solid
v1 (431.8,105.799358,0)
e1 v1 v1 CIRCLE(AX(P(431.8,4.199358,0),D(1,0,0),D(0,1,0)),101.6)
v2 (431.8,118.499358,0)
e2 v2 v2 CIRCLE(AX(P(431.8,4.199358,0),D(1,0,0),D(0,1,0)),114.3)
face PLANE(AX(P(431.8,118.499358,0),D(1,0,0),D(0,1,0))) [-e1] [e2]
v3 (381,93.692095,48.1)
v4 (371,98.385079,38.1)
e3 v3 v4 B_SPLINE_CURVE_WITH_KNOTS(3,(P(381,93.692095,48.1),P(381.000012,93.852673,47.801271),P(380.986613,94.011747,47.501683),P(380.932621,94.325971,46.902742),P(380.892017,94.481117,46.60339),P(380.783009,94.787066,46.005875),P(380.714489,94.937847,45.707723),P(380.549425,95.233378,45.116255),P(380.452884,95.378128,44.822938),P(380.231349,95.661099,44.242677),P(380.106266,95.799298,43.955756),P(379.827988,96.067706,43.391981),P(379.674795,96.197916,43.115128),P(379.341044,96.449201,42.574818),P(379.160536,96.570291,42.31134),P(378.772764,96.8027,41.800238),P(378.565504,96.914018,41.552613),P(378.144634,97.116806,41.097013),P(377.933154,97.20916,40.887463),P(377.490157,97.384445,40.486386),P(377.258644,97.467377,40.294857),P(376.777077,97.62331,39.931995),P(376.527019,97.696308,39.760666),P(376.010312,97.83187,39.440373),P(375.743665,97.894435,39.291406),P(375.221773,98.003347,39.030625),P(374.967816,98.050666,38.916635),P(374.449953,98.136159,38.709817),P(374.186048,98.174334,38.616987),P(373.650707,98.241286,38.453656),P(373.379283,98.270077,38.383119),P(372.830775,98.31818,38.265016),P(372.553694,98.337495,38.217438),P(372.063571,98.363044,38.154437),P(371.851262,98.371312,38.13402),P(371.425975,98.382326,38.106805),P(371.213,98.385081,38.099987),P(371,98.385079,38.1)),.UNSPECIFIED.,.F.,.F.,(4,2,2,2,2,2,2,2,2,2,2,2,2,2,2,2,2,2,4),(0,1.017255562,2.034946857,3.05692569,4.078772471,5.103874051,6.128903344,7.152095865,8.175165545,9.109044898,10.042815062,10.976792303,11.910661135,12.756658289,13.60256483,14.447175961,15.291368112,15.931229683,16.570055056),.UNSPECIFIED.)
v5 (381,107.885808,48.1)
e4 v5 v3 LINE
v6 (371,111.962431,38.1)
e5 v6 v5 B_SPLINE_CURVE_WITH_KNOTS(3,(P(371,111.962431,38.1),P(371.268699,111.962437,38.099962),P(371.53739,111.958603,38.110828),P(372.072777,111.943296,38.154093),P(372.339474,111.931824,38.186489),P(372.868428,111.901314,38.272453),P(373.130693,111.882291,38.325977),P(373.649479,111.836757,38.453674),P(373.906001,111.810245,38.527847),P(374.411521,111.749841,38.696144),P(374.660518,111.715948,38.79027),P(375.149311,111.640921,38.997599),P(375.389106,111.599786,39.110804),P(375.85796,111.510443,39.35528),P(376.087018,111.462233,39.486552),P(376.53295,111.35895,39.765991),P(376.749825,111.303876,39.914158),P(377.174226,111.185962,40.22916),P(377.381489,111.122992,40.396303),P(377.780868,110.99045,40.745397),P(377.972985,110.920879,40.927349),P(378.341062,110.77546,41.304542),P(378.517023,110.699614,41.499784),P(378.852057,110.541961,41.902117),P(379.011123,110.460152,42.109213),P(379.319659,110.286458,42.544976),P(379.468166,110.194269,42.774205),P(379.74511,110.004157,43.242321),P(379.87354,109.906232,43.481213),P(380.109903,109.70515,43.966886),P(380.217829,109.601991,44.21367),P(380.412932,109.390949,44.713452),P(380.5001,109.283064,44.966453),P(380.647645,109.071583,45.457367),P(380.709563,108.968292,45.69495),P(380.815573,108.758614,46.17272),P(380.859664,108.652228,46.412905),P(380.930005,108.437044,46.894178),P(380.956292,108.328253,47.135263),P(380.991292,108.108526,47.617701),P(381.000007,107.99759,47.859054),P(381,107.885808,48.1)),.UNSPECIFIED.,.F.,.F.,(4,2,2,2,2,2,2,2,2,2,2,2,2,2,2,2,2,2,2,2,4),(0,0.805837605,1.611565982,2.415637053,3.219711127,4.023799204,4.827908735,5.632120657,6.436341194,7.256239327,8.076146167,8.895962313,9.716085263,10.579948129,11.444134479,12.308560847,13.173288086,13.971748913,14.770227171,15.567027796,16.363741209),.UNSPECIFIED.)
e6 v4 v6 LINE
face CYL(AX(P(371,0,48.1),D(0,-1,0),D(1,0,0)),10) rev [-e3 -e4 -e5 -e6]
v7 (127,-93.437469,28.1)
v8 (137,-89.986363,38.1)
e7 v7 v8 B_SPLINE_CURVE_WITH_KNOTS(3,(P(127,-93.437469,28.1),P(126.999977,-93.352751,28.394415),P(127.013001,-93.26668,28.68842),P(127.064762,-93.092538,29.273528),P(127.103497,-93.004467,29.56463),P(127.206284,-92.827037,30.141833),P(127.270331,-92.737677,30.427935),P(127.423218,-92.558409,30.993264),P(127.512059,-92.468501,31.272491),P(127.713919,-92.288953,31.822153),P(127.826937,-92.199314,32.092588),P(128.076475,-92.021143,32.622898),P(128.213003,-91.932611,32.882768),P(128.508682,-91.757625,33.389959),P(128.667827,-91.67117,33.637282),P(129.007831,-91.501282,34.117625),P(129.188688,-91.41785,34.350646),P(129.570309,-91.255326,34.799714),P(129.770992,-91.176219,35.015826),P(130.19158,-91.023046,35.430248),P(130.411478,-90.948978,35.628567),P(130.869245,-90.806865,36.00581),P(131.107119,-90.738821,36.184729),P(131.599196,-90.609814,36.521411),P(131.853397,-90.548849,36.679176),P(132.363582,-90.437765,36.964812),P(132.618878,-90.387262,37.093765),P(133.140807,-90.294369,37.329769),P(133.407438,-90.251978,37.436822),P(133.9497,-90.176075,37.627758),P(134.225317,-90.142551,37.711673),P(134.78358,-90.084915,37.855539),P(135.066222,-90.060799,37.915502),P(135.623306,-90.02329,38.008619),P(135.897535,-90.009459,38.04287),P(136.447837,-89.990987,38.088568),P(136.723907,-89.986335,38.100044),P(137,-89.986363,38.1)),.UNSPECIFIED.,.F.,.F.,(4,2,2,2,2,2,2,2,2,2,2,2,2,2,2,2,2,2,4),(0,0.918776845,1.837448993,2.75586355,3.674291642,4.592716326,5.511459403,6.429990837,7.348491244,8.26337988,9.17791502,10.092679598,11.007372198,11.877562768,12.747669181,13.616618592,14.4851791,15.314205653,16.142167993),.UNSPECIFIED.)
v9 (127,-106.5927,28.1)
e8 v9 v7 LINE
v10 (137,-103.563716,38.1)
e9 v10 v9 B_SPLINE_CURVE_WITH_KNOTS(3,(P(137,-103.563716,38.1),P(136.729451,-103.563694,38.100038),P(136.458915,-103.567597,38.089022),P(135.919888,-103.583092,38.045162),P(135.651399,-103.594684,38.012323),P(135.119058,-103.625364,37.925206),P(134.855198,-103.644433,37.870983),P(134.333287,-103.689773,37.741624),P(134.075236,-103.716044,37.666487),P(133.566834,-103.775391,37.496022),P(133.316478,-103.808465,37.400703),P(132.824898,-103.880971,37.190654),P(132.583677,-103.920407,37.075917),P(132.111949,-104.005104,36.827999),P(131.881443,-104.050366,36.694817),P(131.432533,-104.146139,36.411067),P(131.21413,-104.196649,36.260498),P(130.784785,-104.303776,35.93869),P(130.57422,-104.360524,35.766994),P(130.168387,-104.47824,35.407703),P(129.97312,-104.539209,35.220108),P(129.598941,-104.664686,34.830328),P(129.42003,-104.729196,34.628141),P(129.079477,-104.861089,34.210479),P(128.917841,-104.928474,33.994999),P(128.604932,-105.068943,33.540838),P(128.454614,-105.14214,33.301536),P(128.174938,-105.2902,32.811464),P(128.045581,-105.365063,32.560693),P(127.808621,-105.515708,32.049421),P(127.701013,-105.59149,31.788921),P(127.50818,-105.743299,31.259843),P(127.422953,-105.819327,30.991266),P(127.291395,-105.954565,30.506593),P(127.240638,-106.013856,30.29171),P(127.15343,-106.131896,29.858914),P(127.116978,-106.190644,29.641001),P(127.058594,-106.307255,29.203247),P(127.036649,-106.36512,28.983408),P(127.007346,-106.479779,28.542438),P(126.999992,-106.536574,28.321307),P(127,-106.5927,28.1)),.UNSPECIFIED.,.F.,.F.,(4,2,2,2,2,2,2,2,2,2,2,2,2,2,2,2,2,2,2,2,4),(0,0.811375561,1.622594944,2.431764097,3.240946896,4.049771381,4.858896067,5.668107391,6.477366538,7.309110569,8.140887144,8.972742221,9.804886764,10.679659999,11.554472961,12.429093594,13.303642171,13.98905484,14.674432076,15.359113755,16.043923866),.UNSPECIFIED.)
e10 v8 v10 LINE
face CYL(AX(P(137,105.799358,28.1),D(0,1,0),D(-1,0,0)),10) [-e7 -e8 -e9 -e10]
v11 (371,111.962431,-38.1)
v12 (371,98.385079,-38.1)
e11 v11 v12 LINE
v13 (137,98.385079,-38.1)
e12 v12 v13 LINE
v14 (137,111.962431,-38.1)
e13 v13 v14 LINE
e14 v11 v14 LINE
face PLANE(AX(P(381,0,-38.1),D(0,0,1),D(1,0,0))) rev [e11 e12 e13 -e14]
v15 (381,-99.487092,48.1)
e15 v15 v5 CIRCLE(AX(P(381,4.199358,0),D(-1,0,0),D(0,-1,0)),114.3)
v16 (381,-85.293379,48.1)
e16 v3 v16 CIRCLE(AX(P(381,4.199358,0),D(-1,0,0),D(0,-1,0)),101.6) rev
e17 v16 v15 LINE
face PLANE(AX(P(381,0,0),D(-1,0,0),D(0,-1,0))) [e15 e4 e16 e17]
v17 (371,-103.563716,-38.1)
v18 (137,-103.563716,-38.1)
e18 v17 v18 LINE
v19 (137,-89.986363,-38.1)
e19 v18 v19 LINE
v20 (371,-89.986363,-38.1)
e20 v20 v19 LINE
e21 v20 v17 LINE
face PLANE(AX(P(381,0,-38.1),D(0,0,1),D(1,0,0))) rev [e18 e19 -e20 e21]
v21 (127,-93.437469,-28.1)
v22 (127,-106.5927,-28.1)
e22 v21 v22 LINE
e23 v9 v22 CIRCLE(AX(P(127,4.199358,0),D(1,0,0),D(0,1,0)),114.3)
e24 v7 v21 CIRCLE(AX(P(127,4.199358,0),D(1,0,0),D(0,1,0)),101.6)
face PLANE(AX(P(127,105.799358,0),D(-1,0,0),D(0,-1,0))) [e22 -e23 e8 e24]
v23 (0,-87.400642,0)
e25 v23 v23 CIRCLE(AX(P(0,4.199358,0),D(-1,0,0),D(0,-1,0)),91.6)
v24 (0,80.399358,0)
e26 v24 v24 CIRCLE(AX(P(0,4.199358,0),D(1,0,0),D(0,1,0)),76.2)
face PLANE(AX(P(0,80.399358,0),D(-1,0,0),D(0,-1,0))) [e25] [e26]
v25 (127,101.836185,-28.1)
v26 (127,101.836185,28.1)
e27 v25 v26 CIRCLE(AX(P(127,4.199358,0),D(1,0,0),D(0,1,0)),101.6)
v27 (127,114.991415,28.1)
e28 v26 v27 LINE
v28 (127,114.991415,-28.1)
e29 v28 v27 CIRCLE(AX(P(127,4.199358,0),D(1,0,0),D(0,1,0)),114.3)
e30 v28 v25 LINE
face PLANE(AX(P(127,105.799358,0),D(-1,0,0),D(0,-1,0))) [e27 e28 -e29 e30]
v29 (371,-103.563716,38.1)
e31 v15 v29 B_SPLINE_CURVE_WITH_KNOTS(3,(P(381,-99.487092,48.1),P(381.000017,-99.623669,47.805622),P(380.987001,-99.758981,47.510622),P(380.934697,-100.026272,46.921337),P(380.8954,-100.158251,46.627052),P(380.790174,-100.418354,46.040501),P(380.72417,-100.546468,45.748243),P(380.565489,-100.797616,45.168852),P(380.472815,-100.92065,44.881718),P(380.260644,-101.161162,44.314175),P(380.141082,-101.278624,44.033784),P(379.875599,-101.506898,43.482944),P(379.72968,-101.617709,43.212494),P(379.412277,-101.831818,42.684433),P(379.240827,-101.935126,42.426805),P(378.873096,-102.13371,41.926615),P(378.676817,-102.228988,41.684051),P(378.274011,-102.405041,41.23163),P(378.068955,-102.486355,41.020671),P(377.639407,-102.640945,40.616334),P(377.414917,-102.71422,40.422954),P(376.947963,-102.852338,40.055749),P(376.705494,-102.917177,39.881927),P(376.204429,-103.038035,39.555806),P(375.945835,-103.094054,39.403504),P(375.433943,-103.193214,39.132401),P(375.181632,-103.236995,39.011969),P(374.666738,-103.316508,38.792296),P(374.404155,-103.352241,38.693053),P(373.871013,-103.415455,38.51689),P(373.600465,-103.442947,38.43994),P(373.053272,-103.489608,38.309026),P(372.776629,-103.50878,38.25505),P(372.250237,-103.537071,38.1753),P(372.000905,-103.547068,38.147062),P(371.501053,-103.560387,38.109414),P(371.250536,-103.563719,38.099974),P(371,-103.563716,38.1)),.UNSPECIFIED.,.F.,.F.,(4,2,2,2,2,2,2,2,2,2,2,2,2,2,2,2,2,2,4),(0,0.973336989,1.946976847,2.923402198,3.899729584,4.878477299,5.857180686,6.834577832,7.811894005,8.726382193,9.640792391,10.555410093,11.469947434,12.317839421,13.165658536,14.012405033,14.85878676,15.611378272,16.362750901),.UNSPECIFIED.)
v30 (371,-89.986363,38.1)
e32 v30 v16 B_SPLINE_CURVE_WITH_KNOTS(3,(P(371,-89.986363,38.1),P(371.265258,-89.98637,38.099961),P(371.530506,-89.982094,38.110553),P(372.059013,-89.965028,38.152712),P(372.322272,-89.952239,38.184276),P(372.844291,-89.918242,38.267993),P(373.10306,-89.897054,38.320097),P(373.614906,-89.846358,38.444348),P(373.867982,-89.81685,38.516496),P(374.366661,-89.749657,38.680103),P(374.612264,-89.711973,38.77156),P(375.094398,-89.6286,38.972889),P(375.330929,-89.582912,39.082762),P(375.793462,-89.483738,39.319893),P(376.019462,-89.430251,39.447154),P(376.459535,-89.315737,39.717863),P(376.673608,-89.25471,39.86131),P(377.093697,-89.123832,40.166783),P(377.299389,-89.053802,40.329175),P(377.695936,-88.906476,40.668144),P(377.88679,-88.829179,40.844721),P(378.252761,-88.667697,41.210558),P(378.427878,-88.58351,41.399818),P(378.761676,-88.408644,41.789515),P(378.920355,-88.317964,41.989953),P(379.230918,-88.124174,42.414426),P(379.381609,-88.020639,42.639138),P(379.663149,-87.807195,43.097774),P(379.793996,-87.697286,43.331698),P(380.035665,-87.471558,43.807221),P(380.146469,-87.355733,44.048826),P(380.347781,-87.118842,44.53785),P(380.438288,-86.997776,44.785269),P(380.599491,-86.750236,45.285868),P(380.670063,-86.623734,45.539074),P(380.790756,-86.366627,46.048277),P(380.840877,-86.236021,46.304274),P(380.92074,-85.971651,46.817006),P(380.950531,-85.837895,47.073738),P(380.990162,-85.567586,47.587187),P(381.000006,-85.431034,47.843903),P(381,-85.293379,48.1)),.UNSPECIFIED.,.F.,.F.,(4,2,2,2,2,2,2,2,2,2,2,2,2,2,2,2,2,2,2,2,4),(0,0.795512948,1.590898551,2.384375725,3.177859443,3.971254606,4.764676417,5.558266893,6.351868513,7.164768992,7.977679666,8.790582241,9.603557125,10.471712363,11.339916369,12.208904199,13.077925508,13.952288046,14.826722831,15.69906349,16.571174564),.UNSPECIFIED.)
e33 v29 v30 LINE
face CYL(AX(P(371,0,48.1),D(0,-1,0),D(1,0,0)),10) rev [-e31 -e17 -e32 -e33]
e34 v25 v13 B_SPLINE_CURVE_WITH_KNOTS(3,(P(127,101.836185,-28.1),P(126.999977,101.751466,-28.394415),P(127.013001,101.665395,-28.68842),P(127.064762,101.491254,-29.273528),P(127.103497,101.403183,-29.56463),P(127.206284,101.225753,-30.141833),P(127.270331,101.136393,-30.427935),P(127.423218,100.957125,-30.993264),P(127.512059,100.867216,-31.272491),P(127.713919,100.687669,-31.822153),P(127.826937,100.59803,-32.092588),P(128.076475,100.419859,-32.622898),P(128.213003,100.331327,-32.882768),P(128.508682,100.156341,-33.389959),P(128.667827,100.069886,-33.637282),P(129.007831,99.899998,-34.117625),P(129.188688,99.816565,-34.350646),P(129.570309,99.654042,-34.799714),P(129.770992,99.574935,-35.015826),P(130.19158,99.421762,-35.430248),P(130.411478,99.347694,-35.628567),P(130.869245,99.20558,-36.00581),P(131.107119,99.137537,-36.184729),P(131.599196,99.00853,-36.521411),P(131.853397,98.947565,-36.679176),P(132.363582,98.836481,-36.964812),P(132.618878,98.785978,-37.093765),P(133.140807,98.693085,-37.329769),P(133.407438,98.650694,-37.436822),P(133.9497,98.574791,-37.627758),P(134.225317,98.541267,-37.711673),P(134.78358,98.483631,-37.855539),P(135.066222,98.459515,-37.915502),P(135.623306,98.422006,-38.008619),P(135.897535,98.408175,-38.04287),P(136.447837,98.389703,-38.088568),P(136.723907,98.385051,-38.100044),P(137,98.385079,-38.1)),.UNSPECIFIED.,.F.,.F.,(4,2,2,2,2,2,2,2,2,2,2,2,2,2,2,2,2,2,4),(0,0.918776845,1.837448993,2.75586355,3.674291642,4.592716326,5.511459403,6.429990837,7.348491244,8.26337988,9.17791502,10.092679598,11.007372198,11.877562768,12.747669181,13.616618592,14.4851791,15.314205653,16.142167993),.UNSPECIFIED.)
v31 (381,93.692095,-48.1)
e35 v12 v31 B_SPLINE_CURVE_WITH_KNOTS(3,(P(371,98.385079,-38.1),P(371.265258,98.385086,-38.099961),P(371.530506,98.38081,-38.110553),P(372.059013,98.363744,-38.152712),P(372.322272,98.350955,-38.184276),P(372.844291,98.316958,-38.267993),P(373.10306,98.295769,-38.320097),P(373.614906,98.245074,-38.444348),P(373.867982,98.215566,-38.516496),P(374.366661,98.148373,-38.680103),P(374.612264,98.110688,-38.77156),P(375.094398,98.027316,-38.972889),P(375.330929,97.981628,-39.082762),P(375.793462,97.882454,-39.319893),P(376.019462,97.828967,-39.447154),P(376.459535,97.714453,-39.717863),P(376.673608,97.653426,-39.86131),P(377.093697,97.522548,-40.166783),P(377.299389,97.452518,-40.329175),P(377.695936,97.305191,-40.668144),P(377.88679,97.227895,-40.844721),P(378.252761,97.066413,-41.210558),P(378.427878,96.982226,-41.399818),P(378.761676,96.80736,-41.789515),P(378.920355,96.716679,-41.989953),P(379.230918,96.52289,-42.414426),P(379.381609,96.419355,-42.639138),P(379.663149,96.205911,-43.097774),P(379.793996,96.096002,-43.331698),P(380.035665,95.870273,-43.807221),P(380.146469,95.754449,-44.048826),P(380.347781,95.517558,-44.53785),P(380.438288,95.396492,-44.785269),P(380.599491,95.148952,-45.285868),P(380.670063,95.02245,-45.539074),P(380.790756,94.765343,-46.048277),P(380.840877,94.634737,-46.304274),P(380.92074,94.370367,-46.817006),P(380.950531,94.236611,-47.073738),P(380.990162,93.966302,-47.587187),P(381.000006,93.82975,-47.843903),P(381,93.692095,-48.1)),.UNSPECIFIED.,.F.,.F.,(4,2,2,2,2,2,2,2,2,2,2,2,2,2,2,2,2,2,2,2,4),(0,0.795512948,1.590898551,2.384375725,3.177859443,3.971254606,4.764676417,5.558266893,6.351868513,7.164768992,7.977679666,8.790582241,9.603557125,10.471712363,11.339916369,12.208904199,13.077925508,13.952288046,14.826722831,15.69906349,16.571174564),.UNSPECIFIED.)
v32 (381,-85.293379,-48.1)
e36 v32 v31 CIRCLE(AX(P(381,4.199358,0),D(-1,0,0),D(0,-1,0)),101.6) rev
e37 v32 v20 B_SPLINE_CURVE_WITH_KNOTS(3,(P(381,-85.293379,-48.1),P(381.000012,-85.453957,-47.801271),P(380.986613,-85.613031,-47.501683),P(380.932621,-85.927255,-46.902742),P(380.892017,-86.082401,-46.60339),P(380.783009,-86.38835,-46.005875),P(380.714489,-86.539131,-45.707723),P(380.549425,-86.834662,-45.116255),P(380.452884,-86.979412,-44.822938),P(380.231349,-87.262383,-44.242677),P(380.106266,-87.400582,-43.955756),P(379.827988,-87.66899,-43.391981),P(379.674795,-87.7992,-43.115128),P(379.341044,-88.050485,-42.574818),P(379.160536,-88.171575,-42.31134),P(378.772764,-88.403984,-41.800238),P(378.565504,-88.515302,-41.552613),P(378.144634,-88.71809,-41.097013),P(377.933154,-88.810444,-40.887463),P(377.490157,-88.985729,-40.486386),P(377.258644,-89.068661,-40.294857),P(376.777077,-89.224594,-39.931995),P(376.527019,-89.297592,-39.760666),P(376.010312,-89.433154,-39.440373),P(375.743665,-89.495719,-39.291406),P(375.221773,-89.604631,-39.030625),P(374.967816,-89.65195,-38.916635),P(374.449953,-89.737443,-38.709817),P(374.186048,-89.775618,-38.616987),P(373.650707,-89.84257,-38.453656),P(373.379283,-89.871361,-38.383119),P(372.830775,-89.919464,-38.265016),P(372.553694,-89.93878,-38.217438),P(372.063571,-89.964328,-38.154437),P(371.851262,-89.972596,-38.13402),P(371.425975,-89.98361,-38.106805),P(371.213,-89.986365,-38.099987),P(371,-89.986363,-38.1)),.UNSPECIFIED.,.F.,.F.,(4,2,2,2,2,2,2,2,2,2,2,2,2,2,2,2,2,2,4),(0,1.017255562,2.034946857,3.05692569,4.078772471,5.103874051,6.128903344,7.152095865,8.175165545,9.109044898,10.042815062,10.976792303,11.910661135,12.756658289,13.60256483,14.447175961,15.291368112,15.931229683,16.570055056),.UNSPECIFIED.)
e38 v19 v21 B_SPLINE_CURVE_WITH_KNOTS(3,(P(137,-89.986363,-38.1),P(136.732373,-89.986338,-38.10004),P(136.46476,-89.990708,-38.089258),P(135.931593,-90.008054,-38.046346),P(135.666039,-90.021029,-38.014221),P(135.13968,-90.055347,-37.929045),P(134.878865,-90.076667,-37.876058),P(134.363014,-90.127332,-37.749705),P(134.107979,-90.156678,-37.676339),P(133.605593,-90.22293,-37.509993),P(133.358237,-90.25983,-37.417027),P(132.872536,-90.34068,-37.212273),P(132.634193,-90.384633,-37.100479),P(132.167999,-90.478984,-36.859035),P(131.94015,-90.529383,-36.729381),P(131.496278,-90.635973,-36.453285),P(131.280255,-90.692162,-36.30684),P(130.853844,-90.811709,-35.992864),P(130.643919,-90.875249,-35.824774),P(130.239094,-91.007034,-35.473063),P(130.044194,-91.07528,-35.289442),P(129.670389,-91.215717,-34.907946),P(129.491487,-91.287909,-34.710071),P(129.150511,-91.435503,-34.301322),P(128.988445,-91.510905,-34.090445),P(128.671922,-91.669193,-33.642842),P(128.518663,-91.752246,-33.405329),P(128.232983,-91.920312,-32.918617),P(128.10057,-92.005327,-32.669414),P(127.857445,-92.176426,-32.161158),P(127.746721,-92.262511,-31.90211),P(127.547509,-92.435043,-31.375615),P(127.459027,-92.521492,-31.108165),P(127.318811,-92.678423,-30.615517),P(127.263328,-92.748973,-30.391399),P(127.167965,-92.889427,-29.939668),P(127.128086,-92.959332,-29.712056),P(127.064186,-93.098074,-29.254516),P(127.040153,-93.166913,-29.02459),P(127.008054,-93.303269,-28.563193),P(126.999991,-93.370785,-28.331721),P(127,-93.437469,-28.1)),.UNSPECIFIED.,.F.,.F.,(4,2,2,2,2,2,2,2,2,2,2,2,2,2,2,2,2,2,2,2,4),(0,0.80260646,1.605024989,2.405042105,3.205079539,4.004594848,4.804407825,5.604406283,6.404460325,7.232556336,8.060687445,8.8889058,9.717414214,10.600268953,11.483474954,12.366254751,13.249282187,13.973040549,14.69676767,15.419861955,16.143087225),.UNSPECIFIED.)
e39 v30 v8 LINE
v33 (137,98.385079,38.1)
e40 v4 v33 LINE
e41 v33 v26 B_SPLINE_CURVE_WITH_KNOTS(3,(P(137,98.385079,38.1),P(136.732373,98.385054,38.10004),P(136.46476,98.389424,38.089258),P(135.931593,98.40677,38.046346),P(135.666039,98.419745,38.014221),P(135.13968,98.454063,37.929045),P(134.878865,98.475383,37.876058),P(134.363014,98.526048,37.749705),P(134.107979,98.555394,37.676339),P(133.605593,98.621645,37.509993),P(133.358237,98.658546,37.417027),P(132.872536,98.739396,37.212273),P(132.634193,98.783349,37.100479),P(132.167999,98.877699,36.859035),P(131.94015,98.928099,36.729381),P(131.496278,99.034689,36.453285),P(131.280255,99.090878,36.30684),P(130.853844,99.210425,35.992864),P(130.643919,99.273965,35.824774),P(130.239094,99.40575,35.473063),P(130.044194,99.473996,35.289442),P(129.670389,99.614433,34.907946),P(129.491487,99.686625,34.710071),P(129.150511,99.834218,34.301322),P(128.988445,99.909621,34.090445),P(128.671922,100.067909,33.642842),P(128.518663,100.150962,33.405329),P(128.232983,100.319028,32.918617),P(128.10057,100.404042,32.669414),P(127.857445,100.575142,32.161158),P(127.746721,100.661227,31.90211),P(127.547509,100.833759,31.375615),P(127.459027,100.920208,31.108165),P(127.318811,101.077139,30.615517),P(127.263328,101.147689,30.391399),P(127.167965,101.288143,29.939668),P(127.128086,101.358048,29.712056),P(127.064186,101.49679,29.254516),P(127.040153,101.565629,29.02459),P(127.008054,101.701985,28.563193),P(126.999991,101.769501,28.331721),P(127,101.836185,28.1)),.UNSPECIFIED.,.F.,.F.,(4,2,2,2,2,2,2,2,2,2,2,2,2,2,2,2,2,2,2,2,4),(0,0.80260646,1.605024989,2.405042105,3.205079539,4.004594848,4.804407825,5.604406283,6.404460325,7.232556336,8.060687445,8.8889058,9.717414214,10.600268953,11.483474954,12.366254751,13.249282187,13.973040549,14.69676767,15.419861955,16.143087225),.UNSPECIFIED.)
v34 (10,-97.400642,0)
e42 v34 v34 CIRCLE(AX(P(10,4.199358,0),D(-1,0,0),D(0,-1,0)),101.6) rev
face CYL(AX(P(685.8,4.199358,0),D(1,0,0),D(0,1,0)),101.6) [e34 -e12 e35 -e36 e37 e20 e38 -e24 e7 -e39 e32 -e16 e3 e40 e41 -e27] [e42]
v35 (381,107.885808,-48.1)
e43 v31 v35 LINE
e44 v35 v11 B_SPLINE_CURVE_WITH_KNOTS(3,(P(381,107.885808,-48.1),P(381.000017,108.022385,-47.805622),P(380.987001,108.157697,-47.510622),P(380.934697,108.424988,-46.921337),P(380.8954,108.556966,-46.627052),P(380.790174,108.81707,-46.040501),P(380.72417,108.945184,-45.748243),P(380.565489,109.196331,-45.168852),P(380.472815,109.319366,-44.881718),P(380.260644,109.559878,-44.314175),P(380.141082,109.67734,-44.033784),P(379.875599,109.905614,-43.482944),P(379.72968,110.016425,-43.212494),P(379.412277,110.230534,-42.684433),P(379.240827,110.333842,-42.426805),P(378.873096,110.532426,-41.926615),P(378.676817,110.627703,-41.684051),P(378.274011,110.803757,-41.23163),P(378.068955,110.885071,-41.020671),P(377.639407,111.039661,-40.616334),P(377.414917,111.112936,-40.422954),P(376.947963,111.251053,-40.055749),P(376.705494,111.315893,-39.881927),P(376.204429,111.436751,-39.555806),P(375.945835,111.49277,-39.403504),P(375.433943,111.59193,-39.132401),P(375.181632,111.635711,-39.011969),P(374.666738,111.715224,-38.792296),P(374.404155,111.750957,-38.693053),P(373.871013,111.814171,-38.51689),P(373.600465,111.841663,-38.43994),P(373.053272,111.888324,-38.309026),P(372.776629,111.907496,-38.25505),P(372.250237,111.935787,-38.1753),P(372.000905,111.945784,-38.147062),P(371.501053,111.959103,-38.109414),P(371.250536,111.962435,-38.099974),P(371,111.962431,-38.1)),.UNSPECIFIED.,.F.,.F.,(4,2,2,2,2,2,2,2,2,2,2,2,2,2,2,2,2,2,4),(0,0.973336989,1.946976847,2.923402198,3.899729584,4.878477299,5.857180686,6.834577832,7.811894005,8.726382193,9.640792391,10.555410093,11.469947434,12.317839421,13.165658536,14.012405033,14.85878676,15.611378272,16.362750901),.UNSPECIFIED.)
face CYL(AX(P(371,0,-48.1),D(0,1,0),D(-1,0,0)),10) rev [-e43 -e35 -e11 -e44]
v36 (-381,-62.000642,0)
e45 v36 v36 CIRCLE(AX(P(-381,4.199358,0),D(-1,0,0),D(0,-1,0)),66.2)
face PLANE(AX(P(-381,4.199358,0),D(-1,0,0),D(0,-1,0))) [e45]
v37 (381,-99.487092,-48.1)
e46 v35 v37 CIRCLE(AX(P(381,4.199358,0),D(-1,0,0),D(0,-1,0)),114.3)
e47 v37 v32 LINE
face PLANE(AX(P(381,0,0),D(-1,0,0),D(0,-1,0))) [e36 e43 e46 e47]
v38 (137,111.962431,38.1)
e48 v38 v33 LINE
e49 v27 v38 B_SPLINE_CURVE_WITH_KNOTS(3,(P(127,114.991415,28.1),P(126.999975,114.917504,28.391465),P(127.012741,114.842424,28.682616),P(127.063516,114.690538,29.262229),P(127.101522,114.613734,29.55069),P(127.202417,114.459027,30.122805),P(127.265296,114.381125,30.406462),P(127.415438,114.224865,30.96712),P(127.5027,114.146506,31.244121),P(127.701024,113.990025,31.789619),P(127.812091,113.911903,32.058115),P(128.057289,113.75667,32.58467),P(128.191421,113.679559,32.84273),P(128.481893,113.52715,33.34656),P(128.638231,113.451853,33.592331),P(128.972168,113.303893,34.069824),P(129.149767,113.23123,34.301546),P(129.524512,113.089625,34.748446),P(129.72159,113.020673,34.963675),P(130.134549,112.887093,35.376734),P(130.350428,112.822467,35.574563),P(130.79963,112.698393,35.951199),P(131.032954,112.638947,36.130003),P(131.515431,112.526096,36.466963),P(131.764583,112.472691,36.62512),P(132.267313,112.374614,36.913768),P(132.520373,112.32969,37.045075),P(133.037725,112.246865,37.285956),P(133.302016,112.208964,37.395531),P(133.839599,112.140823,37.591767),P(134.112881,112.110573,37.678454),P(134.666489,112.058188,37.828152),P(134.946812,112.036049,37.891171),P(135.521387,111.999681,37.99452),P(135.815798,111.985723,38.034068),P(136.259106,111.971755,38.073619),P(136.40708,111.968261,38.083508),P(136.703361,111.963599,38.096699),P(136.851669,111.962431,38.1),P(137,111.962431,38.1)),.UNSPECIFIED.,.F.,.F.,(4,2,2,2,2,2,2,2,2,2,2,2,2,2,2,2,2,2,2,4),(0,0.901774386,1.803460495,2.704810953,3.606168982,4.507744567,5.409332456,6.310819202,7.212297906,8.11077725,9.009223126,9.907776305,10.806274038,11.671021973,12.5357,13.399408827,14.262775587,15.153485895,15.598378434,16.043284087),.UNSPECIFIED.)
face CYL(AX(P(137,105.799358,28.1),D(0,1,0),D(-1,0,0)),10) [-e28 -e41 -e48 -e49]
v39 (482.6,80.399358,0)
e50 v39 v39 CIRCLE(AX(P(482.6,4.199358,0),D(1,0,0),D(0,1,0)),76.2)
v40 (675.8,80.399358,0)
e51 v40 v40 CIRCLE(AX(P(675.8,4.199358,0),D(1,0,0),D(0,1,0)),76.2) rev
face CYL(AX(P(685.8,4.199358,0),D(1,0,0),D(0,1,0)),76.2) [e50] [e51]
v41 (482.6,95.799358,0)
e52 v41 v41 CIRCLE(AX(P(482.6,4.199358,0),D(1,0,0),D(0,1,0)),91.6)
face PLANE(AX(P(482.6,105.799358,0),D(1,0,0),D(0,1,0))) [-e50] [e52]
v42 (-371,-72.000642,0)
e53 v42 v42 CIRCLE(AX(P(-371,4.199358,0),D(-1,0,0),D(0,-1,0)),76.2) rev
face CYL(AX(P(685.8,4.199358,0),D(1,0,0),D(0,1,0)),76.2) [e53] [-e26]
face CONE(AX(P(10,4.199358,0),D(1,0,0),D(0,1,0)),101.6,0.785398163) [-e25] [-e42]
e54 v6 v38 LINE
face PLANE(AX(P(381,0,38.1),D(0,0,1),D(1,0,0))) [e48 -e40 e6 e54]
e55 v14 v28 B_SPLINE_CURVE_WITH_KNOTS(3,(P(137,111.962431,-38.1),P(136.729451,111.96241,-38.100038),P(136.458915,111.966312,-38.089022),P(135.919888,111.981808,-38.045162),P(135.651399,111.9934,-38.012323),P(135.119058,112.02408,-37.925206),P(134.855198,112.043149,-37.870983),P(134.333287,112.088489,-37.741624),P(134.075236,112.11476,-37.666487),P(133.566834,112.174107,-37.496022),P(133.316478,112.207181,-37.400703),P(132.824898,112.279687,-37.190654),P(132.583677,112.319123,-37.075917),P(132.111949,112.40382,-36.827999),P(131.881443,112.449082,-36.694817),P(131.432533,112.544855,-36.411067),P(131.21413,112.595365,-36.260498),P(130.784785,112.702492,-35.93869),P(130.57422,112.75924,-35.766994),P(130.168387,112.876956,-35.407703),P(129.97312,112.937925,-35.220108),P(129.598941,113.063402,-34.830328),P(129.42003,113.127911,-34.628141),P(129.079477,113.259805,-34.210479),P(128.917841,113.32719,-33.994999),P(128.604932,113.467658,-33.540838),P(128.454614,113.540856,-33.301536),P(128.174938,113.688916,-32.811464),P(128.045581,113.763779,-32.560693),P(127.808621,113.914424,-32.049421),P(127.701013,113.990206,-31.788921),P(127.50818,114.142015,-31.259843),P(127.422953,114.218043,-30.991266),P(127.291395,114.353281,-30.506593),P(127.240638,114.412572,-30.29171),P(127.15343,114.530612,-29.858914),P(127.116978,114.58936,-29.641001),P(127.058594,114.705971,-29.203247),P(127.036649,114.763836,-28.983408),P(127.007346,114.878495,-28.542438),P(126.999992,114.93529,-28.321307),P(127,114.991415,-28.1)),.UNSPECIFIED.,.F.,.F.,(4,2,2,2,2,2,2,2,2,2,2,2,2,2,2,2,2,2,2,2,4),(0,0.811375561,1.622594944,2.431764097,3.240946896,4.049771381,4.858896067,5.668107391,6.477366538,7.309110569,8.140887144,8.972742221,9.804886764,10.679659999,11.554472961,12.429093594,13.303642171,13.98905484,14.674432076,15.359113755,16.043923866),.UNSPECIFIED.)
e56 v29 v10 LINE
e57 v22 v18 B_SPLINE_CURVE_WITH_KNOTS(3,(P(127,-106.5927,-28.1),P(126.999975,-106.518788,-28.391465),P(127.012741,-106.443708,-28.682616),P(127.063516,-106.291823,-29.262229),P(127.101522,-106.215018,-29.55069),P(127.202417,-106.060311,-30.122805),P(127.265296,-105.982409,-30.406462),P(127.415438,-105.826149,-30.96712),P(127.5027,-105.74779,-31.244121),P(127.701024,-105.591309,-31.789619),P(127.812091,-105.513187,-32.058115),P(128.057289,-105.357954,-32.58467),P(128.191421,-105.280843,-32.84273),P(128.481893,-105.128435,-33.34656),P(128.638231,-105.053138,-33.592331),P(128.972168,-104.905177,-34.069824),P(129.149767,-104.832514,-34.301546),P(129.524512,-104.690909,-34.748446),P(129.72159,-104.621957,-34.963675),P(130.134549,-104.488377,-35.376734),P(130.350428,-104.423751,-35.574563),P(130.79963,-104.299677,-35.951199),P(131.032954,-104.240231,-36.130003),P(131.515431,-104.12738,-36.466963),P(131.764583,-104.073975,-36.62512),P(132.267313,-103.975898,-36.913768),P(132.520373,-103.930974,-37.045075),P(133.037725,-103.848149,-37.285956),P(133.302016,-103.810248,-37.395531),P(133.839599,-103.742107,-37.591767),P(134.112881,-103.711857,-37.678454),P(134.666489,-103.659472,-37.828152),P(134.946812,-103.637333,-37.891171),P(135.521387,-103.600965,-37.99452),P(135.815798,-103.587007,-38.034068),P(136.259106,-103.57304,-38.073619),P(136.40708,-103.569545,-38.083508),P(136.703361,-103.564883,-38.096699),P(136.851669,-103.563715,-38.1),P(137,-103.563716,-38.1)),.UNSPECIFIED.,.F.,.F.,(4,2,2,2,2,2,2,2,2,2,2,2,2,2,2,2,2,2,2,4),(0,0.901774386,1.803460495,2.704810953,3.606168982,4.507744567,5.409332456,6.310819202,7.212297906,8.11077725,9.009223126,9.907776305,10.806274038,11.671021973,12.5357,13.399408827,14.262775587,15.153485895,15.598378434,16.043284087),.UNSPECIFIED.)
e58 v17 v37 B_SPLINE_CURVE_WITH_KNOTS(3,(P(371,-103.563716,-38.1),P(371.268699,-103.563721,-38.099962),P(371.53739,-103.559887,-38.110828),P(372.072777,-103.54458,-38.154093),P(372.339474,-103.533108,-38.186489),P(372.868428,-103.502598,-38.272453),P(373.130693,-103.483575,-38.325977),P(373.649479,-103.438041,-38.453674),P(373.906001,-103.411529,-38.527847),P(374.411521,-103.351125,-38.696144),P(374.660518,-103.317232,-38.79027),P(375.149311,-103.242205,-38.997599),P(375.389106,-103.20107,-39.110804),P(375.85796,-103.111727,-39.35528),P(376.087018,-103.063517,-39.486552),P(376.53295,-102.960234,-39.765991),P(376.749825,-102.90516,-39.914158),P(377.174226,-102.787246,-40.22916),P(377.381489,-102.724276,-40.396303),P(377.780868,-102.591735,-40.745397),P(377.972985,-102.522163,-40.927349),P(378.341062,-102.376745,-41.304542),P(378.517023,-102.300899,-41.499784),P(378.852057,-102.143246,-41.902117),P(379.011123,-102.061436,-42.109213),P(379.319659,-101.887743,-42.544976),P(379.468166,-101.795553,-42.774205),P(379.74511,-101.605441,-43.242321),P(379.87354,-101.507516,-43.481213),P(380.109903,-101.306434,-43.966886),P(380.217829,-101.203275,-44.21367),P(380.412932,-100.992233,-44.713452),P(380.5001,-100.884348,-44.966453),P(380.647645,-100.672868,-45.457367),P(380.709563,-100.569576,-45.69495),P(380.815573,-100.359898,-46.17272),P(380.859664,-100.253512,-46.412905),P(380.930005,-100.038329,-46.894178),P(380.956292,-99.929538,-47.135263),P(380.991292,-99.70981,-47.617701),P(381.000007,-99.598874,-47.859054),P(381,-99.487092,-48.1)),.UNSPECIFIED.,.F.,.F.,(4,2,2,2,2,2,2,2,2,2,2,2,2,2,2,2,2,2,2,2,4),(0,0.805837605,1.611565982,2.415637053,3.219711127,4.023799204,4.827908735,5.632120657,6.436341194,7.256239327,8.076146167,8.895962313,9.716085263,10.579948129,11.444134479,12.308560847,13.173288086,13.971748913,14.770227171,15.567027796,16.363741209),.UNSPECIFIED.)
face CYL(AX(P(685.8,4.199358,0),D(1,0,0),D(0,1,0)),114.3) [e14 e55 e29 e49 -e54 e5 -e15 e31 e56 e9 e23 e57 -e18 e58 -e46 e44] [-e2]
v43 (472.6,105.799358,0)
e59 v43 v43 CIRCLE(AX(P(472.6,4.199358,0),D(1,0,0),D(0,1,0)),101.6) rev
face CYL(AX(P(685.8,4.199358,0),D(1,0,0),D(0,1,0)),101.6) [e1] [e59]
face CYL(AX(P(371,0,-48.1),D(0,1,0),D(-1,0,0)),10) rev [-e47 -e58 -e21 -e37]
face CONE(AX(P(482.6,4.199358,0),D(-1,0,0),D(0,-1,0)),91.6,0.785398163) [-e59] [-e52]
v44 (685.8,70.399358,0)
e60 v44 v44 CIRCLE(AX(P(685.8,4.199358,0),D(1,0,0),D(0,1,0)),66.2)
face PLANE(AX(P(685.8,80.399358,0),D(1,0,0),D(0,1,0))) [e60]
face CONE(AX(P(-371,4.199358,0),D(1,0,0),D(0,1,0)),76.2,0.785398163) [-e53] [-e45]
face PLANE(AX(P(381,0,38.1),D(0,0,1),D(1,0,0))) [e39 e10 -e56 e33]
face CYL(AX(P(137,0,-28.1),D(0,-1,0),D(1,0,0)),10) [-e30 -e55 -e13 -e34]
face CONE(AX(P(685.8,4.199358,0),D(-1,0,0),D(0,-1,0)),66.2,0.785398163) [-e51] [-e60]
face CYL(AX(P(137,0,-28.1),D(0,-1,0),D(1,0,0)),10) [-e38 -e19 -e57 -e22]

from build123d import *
from build123d.topology import SkipClean

# Parameters (mm, degrees)
CUT_EXTRUDE1_START = -254
CUT_EXTRUDE1_DEPTH = 254
CHAMFER1_SIZE      = 10
CHAMFER2_SIZE      = 10
CHAMFER3_SIZE      = 10
CHAMFER4_SIZE      = 10
FILLET1_R          = 10


with BuildPart() as part:
    # Sketch1 → Revolve4 (revolve)
    with BuildSketch(Plane.XY):
        Polygon((-381, 4.199357945), (-381, 80.399357945), (0, 80.399357945), (0, 105.799357945), (127, 105.799357945), (127, 118.499357945), (431.8, 118.499357945), (431.8, 105.799357945), (482.6, 105.799357945), (482.6, 80.399357945), (685.8, 80.399357945), (685.8, 4.199357945), align=None)
    revolve(axis=Axis((685.8, 4.199357945, 0), (-1, 0, 0)))

    # Sketch3 → Cut-Extrude1 (cut)
    with SkipClean():  # the faces are left unmerged after this step: merging them gives an invalid solid
        with BuildSketch(Plane.ZY.offset(-127).offset(CUT_EXTRUDE1_START)):
            with BuildLine():
                Line((38.1, -89.986362841), (38.1, -103.563715507))
                ThreePointArc((38.1, -103.563715507), (93.3255592, -61.791777823), (114.3, 4.199357945))
                ThreePointArc((114.3, 4.199357945), (93.3255592, 70.190493714), (38.1, 111.962431398))
                Line((38.1, 111.962431398), (38.1, 98.385078732))
                ThreePointArc((38.1, 98.385078732), (84.242269675, 60.995484574), (101.6, 4.199357945))
                ThreePointArc((101.6, 4.199357945), (84.242269675, -52.596768683), (38.1, -89.986362841))
            make_face()
            with BuildLine():
                ThreePointArc((-38.1, 111.962431398), (-114.3, 4.199357945), (-38.1, -103.563715507))
                Line((-38.1, -103.563715507), (-38.1, -89.986362841))
                ThreePointArc((-38.1, -89.986362841), (-101.6, 4.199357945), (-38.1, 98.385078732))
                Line((-38.1, 98.385078732), (-38.1, 111.962431398))
            make_face()
        extrude(amount=CUT_EXTRUDE1_DEPTH, mode=Mode.SUBTRACT)

    # Chamfer1
    chamfer1_edges = [part.edges().sort_by_distance(p)[0] for p in [
        (685.8, -72.000642055, 0),
    ]]
    chamfer(chamfer1_edges, length=CHAMFER1_SIZE)

    # Chamfer2
    chamfer2_edges = [part.edges().sort_by_distance(p)[0] for p in [
        (482.6, -97.400642055, 0),
    ]]
    chamfer(chamfer2_edges, length=CHAMFER2_SIZE)

    # Chamfer3
    chamfer3_edges = [part.edges().sort_by_distance(p)[0] for p in [
        (-381, -72.000642055, 0),
    ]]
    chamfer(chamfer3_edges, length=CHAMFER3_SIZE)

    # Chamfer4
    chamfer4_edges = [part.edges().sort_by_distance(p)[0] for p in [
        (0, -97.400642055, 0),
    ]]
    chamfer(chamfer4_edges, length=CHAMFER4_SIZE)

    # Fillet1
    # the kernel refuses this fillet: 10 mm, written as the material it adds along each edge
    with BuildSketch(Plane(origin=(381, -64.986362841, 38.1), x_dir=(-1, 0, 0), z_dir=(0, -1, 0))) as fillet1_piece_1_section:
        with BuildLine():
            CenterArc((FILLET1_R, -FILLET1_R), FILLET1_R, 90, 90)
            Line((0, -FILLET1_R), (-FILLET1_R * 0.02, -FILLET1_R))
            Line((-FILLET1_R * 0.02, -FILLET1_R), (-FILLET1_R * 0.02, FILLET1_R * 0.02))
            Line((-FILLET1_R * 0.02, FILLET1_R * 0.02), (FILLET1_R, FILLET1_R * 0.02))
            Line((FILLET1_R, FILLET1_R * 0.02), (FILLET1_R, 0))
        make_face()
    fillet1_piece_1 = extrude(amount=63.577352667, mode=Mode.PRIVATE)
    fillet1_piece_1 = fillet1_piece_1 - Plane(origin=(378.747471164, 4.199357945, 0), x_dir=(0, 0.9270248108869475, 0.3750000000000256), z_dir=(1, 0, 0)) * Cylinder(101.6, 168, mode=Mode.PRIVATE)
    fillet1_piece_1 = fillet1_piece_1 & Plane(origin=(378.747471164, 4.199357945, 0), x_dir=(0, 1, 0), z_dir=(1, 0, 0)) * Cylinder(114.3, 168, mode=Mode.PRIVATE)
    add(fillet1_piece_1)
    with BuildSketch(Plane(origin=(381, 136.962431398, 38.1), x_dir=(-1, 0, 0), z_dir=(0, -1, 0))) as fillet1_piece_2_section:
        with BuildLine():
            CenterArc((FILLET1_R, -FILLET1_R), FILLET1_R, 90, 90)
            Line((0, -FILLET1_R), (-FILLET1_R * 0.02, -FILLET1_R))
            Line((-FILLET1_R * 0.02, -FILLET1_R), (-FILLET1_R * 0.02, FILLET1_R * 0.02))
            Line((-FILLET1_R * 0.02, FILLET1_R * 0.02), (FILLET1_R, FILLET1_R * 0.02))
            Line((FILLET1_R, FILLET1_R * 0.02), (FILLET1_R, 0))
        make_face()
    fillet1_piece_2 = extrude(amount=63.577352667, mode=Mode.PRIVATE)
    fillet1_piece_2 = fillet1_piece_2 - Plane(origin=(378.747465839, 4.199357945, 0), x_dir=(0, 0.9270248108869475, 0.3750000000000256), z_dir=(1, 0, 0)) * Cylinder(101.6, 168, mode=Mode.PRIVATE)
    fillet1_piece_2 = fillet1_piece_2 & Plane(origin=(378.747465839, 4.199357945, 0), x_dir=(0, 1, 0), z_dir=(1, 0, 0)) * Cylinder(114.3, 168, mode=Mode.PRIVATE)
    add(fillet1_piece_2)
    with BuildSketch(Plane(origin=(381, 73.385078732, -38.1), x_dir=(-1, 0, 0), z_dir=(0, 1, 0))) as fillet1_piece_3_section:
        with BuildLine():
            CenterArc((FILLET1_R, -FILLET1_R), FILLET1_R, 90, 90)
            Line((0, -FILLET1_R), (-FILLET1_R * 0.02, -FILLET1_R))
            Line((-FILLET1_R * 0.02, -FILLET1_R), (-FILLET1_R * 0.02, FILLET1_R * 0.02))
            Line((-FILLET1_R * 0.02, FILLET1_R * 0.02), (FILLET1_R, FILLET1_R * 0.02))
            Line((FILLET1_R, FILLET1_R * 0.02), (FILLET1_R, 0))
        make_face()
    fillet1_piece_3 = extrude(amount=63.577352667, mode=Mode.PRIVATE)
    fillet1_piece_3 = fillet1_piece_3 - Plane(origin=(378.747465659, 4.199357945, 0), x_dir=(0, -0.9270248108869582, -0.3749999999999992), z_dir=(1, 0, 0)) * Cylinder(101.6, 168, mode=Mode.PRIVATE)
    fillet1_piece_3 = fillet1_piece_3 & Plane(origin=(378.747465659, 4.199357945, 0), x_dir=(0, 1, 0), z_dir=(1, 0, 0)) * Cylinder(114.3, 168, mode=Mode.PRIVATE)
    add(fillet1_piece_3)
    with BuildSketch(Plane(origin=(381, -128.563715507, -38.1), x_dir=(-1, 0, 0), z_dir=(0, 1, 0))) as fillet1_piece_4_section:
        with BuildLine():
            CenterArc((FILLET1_R, -FILLET1_R), FILLET1_R, 90, 90)
            Line((0, -FILLET1_R), (-FILLET1_R * 0.02, -FILLET1_R))
            Line((-FILLET1_R * 0.02, -FILLET1_R), (-FILLET1_R * 0.02, FILLET1_R * 0.02))
            Line((-FILLET1_R * 0.02, FILLET1_R * 0.02), (FILLET1_R, FILLET1_R * 0.02))
            Line((FILLET1_R, FILLET1_R * 0.02), (FILLET1_R, 0))
        make_face()
    fillet1_piece_4 = extrude(amount=63.577352667, mode=Mode.PRIVATE)
    fillet1_piece_4 = fillet1_piece_4 - Plane(origin=(378.747464841, 4.199357945, 0), x_dir=(0, -0.9270248108869582, -0.3749999999999992), z_dir=(1, 0, 0)) * Cylinder(101.6, 168, mode=Mode.PRIVATE)
    fillet1_piece_4 = fillet1_piece_4 & Plane(origin=(378.747464841, 4.199357945, 0), x_dir=(0, 1, 0), z_dir=(1, 0, 0)) * Cylinder(114.3, 168, mode=Mode.PRIVATE)
    add(fillet1_piece_4)
    # the kernel refuses this fillet: 10 mm, written as the material it takes off along each edge
    with BuildSketch(Plane(origin=(127, -64.986362841, 38.1), x_dir=(0, 0, -1), z_dir=(0, -1, 0))) as fillet1_2_piece_1_section:
        with BuildLine():
            CenterArc((FILLET1_R, FILLET1_R), FILLET1_R, 180, 90)
            Line((0, FILLET1_R), (-FILLET1_R * 0.02, FILLET1_R))
            Line((-FILLET1_R * 0.02, FILLET1_R), (-FILLET1_R * 0.02, -FILLET1_R * 0.02))
            Line((-FILLET1_R * 0.02, -FILLET1_R * 0.02), (FILLET1_R, -FILLET1_R * 0.02))
            Line((FILLET1_R, -FILLET1_R * 0.02), (FILLET1_R, 0))
        make_face()
    fillet1_2_piece_1 = extrude(amount=63.577352667, mode=Mode.PRIVATE)
    fillet1_2_piece_1 = fillet1_2_piece_1 - Plane(origin=(129.273265728, 4.199357945, 0), x_dir=(0, 1, 0), z_dir=(1, 0, 0)) * Cylinder(101.6, 168, mode=Mode.PRIVATE)
    fillet1_2_piece_1 = fillet1_2_piece_1 & Plane(origin=(129.273265728, 4.199357945, 0), x_dir=(0, 1, 0), z_dir=(1, 0, 0)) * Cylinder(114.3, 168, mode=Mode.PRIVATE)
    add(fillet1_2_piece_1, mode=Mode.SUBTRACT)
    with BuildSketch(Plane(origin=(127, 136.962431398, 38.1), x_dir=(0, 0, -1), z_dir=(0, -1, 0))) as fillet1_2_piece_2_section:
        with BuildLine():
            CenterArc((FILLET1_R, FILLET1_R), FILLET1_R, 180, 90)
            Line((0, FILLET1_R), (-FILLET1_R * 0.02, FILLET1_R))
            Line((-FILLET1_R * 0.02, FILLET1_R), (-FILLET1_R * 0.02, -FILLET1_R * 0.02))
            Line((-FILLET1_R * 0.02, -FILLET1_R * 0.02), (FILLET1_R, -FILLET1_R * 0.02))
            Line((FILLET1_R, -FILLET1_R * 0.02), (FILLET1_R, 0))
        make_face()
    fillet1_2_piece_2 = extrude(amount=63.577352667, mode=Mode.PRIVATE)
    fillet1_2_piece_2 = fillet1_2_piece_2 - Plane(origin=(129.273255891, 4.199357945, 0), x_dir=(0, 1, 0), z_dir=(1, 0, 0)) * Cylinder(101.6, 168, mode=Mode.PRIVATE)
    fillet1_2_piece_2 = fillet1_2_piece_2 & Plane(origin=(129.273255891, 4.199357945, 0), x_dir=(0, 1, 0), z_dir=(1, 0, 0)) * Cylinder(114.3, 168, mode=Mode.PRIVATE)
    add(fillet1_2_piece_2, mode=Mode.SUBTRACT)
    with BuildSketch(Plane(origin=(127, -128.563715507, -38.1), x_dir=(0, 0, 1), z_dir=(0, 1, 0))) as fillet1_2_piece_3_section:
        with BuildLine():
            CenterArc((FILLET1_R, FILLET1_R), FILLET1_R, 180, 90)
            Line((0, FILLET1_R), (-FILLET1_R * 0.02, FILLET1_R))
            Line((-FILLET1_R * 0.02, FILLET1_R), (-FILLET1_R * 0.02, -FILLET1_R * 0.02))
            Line((-FILLET1_R * 0.02, -FILLET1_R * 0.02), (FILLET1_R, -FILLET1_R * 0.02))
            Line((FILLET1_R, -FILLET1_R * 0.02), (FILLET1_R, 0))
        make_face()
    fillet1_2_piece_3 = extrude(amount=63.577352667, mode=Mode.PRIVATE)
    fillet1_2_piece_3 = fillet1_2_piece_3 - Plane(origin=(129.273255891, 4.199357945, 0), x_dir=(0, 1, 0), z_dir=(1, 0, 0)) * Cylinder(101.6, 168, mode=Mode.PRIVATE)
    fillet1_2_piece_3 = fillet1_2_piece_3 & Plane(origin=(129.273255891, 4.199357945, 0), x_dir=(0, 1, 0), z_dir=(1, 0, 0)) * Cylinder(114.3, 168, mode=Mode.PRIVATE)
    add(fillet1_2_piece_3, mode=Mode.SUBTRACT)
    with BuildSketch(Plane(origin=(127, 73.385078732, -38.1), x_dir=(0, 0, 1), z_dir=(0, 1, 0))) as fillet1_2_piece_4_section:
        with BuildLine():
            CenterArc((FILLET1_R, FILLET1_R), FILLET1_R, 180, 90)
            Line((0, FILLET1_R), (-FILLET1_R * 0.02, FILLET1_R))
            Line((-FILLET1_R * 0.02, FILLET1_R), (-FILLET1_R * 0.02, -FILLET1_R * 0.02))
            Line((-FILLET1_R * 0.02, -FILLET1_R * 0.02), (FILLET1_R, -FILLET1_R * 0.02))
            Line((FILLET1_R, -FILLET1_R * 0.02), (FILLET1_R, 0))
        make_face()
    fillet1_2_piece_4 = extrude(amount=63.577352667, mode=Mode.PRIVATE)
    fillet1_2_piece_4 = fillet1_2_piece_4 - Plane(origin=(129.273265728, 4.199357945, 0), x_dir=(0, 1, 0), z_dir=(1, 0, 0)) * Cylinder(101.6, 168, mode=Mode.PRIVATE)
    fillet1_2_piece_4 = fillet1_2_piece_4 & Plane(origin=(129.273265728, 4.199357945, 0), x_dir=(0, 1, 0), z_dir=(1, 0, 0)) * Cylinder(114.3, 168, mode=Mode.PRIVATE)
    add(fillet1_2_piece_4, mode=Mode.SUBTRACT)


solid = part.part
